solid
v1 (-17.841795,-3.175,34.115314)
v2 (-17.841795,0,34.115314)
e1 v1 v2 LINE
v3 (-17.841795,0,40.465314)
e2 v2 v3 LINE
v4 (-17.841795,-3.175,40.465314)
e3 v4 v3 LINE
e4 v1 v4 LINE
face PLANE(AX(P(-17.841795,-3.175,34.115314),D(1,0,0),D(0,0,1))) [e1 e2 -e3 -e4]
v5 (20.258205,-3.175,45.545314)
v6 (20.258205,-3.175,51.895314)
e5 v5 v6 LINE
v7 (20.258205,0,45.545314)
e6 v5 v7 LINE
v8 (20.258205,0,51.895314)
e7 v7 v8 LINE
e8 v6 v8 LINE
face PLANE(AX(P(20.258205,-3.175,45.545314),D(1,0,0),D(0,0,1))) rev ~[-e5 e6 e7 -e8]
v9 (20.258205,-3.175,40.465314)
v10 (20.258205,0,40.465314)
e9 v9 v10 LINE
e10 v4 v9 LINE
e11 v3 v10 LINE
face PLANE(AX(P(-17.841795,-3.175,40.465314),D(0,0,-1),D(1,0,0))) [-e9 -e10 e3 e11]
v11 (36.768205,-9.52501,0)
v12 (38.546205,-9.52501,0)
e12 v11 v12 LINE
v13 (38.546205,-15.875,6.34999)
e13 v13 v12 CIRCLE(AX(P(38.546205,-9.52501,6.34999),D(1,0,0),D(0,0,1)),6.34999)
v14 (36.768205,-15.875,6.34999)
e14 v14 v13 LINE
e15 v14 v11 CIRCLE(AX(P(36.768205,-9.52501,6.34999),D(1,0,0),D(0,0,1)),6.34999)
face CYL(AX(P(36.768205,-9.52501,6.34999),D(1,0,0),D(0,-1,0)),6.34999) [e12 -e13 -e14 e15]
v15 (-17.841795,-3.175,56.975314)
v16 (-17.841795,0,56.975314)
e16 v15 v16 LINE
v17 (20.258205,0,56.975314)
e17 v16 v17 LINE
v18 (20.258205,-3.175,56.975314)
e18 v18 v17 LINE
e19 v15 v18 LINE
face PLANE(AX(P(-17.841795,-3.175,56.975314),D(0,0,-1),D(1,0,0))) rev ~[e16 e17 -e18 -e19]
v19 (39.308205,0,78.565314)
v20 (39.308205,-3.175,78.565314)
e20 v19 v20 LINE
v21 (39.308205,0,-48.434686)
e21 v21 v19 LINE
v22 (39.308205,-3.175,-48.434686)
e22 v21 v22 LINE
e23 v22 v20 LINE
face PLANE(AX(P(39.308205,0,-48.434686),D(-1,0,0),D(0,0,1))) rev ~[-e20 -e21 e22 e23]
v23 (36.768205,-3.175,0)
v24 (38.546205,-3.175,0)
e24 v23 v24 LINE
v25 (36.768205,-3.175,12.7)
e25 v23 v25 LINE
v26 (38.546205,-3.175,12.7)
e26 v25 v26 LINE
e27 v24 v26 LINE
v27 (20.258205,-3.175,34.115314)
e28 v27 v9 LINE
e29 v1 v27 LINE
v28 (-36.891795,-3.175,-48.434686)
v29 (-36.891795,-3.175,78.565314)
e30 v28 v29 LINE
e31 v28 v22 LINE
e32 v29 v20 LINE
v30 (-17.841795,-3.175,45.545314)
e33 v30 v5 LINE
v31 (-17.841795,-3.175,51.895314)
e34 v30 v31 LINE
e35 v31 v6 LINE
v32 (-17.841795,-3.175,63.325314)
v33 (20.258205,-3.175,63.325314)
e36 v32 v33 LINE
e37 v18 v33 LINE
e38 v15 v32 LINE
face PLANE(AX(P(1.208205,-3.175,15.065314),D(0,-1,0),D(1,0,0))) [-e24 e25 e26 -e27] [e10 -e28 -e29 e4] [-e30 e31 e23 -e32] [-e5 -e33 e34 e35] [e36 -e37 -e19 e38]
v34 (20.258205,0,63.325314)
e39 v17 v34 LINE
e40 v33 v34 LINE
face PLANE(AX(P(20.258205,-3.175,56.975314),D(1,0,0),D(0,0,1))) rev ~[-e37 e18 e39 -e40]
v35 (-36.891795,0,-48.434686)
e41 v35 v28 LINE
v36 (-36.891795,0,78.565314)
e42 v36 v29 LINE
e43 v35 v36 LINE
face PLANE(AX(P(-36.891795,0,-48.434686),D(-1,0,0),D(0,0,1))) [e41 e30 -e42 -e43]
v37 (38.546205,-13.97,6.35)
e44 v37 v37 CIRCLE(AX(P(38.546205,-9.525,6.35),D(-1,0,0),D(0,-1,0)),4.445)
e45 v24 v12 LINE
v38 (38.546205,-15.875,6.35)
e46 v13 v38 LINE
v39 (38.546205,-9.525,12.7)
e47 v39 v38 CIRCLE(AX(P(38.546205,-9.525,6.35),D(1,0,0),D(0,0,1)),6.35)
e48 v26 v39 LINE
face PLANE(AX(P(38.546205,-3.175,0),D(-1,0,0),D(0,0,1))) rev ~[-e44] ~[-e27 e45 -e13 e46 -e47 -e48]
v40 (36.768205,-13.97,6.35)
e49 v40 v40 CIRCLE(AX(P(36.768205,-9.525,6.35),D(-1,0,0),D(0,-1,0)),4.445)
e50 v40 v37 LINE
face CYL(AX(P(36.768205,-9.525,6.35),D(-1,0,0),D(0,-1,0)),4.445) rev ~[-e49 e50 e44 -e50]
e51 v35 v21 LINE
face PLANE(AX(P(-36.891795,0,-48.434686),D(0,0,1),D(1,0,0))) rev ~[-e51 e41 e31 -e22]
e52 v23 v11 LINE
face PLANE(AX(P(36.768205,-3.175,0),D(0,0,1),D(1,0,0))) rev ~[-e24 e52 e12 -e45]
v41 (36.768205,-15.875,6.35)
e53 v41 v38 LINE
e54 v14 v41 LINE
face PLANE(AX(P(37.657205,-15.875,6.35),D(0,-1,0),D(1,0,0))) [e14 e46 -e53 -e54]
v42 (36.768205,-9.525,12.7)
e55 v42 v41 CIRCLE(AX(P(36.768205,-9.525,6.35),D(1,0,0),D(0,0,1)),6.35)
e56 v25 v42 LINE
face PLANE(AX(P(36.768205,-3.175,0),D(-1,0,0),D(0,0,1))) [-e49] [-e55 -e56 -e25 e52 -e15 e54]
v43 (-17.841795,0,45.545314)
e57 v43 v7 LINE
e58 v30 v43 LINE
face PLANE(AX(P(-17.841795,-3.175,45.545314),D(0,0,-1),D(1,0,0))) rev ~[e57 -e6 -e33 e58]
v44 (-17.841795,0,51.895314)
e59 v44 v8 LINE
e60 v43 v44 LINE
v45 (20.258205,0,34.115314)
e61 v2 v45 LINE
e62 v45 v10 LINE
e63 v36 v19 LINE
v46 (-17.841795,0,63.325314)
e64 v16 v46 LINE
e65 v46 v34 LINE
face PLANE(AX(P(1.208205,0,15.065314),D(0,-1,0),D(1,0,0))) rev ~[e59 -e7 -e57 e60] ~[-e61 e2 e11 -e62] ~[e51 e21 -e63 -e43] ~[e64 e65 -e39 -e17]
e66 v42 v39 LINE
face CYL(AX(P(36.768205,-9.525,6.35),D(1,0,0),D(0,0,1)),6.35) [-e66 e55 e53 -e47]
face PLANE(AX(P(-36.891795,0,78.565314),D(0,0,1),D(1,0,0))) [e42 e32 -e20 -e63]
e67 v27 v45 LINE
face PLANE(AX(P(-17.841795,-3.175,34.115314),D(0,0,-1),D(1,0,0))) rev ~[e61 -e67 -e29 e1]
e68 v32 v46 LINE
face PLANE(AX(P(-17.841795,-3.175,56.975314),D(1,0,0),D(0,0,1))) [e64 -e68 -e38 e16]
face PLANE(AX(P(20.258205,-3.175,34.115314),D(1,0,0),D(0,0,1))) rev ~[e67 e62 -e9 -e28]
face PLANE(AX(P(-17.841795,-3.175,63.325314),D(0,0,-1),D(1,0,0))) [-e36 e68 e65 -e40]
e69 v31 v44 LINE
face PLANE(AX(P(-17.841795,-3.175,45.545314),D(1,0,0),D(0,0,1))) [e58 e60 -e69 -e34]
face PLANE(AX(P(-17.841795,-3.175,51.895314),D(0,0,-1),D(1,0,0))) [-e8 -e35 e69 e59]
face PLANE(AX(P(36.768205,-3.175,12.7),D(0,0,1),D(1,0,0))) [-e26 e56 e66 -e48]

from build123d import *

# Parameters (mm, degrees)
F0_W     = 76.2
F0_H     = 127
F1_DEPTH = 3.175
F2_W     = 38.1
F2_H     = 6.35
F3_DEPTH = 3.175
F4_W     = 1.778
F4_H     = 12.7
F5_DEPTH = 12.7
F6_R     = 6.35
F7_R     = 6.34999
F8_R     = 4.445
F9_DEPTH = 25.4


# Not quite as in the source:
# - a fillet or chamfer is up to 0.001 mm smaller than in the source, because OpenCascade refuses the exact size


with BuildPart() as f1:
    # F0 (on Front) → F1 (new body)
    with BuildSketch(Plane.XZ):
        with Locations((1.208204776, 15.0653144508)):
            Rectangle(F0_W, F0_H)
    extrude(amount=F1_DEPTH)

    # F2 (on face) → F3 (cut)
    with BuildSketch(Plane.XZ.offset(3.175)):
        with Locations((1.208204776, 60.1503144508)):
            Rectangle(F2_W, F2_H)
        with Locations((1.208204776, 48.7203144508)):
            Rectangle(F2_W, F2_H)
        with Locations((1.208204776, 37.2903144508)):
            Rectangle(F2_W, F2_H)
    extrude(amount=-F3_DEPTH, mode=Mode.SUBTRACT)

    # F4 (on face) → F5 (join)
    with BuildSketch(Plane.XZ.offset(3.175)):
        with Locations((37.657204776, 6.35)):
            Rectangle(F4_W, F4_H)
    extrude(amount=F5_DEPTH)

    # F6
    f6_edges = [f1.edges().sort_by_distance(p)[0] for p in [
        (37.657205, -15.875, 12.7),
    ]]
    fillet(f6_edges, radius=F6_R)

    # F7 (radius 6.35 in the source; OpenCascade refuses exactly that, so slightly less here)
    f7_edges = [f1.edges().sort_by_distance(p)[0] for p in [
        (37.657205, -15.875, 0),
    ]]
    fillet(f7_edges, radius=F7_R)

    # F8 (on face) → F9 (cut)
    with BuildSketch(Plane(origin=(36.768204776, 0, 0), x_dir=(0, -1, 0), z_dir=(-1, 0, 0))):
        with Locations((9.525, 6.35)):
            Circle(F8_R)
    extrude(amount=-F9_DEPTH, mode=Mode.SUBTRACT)


solid = f1.part
